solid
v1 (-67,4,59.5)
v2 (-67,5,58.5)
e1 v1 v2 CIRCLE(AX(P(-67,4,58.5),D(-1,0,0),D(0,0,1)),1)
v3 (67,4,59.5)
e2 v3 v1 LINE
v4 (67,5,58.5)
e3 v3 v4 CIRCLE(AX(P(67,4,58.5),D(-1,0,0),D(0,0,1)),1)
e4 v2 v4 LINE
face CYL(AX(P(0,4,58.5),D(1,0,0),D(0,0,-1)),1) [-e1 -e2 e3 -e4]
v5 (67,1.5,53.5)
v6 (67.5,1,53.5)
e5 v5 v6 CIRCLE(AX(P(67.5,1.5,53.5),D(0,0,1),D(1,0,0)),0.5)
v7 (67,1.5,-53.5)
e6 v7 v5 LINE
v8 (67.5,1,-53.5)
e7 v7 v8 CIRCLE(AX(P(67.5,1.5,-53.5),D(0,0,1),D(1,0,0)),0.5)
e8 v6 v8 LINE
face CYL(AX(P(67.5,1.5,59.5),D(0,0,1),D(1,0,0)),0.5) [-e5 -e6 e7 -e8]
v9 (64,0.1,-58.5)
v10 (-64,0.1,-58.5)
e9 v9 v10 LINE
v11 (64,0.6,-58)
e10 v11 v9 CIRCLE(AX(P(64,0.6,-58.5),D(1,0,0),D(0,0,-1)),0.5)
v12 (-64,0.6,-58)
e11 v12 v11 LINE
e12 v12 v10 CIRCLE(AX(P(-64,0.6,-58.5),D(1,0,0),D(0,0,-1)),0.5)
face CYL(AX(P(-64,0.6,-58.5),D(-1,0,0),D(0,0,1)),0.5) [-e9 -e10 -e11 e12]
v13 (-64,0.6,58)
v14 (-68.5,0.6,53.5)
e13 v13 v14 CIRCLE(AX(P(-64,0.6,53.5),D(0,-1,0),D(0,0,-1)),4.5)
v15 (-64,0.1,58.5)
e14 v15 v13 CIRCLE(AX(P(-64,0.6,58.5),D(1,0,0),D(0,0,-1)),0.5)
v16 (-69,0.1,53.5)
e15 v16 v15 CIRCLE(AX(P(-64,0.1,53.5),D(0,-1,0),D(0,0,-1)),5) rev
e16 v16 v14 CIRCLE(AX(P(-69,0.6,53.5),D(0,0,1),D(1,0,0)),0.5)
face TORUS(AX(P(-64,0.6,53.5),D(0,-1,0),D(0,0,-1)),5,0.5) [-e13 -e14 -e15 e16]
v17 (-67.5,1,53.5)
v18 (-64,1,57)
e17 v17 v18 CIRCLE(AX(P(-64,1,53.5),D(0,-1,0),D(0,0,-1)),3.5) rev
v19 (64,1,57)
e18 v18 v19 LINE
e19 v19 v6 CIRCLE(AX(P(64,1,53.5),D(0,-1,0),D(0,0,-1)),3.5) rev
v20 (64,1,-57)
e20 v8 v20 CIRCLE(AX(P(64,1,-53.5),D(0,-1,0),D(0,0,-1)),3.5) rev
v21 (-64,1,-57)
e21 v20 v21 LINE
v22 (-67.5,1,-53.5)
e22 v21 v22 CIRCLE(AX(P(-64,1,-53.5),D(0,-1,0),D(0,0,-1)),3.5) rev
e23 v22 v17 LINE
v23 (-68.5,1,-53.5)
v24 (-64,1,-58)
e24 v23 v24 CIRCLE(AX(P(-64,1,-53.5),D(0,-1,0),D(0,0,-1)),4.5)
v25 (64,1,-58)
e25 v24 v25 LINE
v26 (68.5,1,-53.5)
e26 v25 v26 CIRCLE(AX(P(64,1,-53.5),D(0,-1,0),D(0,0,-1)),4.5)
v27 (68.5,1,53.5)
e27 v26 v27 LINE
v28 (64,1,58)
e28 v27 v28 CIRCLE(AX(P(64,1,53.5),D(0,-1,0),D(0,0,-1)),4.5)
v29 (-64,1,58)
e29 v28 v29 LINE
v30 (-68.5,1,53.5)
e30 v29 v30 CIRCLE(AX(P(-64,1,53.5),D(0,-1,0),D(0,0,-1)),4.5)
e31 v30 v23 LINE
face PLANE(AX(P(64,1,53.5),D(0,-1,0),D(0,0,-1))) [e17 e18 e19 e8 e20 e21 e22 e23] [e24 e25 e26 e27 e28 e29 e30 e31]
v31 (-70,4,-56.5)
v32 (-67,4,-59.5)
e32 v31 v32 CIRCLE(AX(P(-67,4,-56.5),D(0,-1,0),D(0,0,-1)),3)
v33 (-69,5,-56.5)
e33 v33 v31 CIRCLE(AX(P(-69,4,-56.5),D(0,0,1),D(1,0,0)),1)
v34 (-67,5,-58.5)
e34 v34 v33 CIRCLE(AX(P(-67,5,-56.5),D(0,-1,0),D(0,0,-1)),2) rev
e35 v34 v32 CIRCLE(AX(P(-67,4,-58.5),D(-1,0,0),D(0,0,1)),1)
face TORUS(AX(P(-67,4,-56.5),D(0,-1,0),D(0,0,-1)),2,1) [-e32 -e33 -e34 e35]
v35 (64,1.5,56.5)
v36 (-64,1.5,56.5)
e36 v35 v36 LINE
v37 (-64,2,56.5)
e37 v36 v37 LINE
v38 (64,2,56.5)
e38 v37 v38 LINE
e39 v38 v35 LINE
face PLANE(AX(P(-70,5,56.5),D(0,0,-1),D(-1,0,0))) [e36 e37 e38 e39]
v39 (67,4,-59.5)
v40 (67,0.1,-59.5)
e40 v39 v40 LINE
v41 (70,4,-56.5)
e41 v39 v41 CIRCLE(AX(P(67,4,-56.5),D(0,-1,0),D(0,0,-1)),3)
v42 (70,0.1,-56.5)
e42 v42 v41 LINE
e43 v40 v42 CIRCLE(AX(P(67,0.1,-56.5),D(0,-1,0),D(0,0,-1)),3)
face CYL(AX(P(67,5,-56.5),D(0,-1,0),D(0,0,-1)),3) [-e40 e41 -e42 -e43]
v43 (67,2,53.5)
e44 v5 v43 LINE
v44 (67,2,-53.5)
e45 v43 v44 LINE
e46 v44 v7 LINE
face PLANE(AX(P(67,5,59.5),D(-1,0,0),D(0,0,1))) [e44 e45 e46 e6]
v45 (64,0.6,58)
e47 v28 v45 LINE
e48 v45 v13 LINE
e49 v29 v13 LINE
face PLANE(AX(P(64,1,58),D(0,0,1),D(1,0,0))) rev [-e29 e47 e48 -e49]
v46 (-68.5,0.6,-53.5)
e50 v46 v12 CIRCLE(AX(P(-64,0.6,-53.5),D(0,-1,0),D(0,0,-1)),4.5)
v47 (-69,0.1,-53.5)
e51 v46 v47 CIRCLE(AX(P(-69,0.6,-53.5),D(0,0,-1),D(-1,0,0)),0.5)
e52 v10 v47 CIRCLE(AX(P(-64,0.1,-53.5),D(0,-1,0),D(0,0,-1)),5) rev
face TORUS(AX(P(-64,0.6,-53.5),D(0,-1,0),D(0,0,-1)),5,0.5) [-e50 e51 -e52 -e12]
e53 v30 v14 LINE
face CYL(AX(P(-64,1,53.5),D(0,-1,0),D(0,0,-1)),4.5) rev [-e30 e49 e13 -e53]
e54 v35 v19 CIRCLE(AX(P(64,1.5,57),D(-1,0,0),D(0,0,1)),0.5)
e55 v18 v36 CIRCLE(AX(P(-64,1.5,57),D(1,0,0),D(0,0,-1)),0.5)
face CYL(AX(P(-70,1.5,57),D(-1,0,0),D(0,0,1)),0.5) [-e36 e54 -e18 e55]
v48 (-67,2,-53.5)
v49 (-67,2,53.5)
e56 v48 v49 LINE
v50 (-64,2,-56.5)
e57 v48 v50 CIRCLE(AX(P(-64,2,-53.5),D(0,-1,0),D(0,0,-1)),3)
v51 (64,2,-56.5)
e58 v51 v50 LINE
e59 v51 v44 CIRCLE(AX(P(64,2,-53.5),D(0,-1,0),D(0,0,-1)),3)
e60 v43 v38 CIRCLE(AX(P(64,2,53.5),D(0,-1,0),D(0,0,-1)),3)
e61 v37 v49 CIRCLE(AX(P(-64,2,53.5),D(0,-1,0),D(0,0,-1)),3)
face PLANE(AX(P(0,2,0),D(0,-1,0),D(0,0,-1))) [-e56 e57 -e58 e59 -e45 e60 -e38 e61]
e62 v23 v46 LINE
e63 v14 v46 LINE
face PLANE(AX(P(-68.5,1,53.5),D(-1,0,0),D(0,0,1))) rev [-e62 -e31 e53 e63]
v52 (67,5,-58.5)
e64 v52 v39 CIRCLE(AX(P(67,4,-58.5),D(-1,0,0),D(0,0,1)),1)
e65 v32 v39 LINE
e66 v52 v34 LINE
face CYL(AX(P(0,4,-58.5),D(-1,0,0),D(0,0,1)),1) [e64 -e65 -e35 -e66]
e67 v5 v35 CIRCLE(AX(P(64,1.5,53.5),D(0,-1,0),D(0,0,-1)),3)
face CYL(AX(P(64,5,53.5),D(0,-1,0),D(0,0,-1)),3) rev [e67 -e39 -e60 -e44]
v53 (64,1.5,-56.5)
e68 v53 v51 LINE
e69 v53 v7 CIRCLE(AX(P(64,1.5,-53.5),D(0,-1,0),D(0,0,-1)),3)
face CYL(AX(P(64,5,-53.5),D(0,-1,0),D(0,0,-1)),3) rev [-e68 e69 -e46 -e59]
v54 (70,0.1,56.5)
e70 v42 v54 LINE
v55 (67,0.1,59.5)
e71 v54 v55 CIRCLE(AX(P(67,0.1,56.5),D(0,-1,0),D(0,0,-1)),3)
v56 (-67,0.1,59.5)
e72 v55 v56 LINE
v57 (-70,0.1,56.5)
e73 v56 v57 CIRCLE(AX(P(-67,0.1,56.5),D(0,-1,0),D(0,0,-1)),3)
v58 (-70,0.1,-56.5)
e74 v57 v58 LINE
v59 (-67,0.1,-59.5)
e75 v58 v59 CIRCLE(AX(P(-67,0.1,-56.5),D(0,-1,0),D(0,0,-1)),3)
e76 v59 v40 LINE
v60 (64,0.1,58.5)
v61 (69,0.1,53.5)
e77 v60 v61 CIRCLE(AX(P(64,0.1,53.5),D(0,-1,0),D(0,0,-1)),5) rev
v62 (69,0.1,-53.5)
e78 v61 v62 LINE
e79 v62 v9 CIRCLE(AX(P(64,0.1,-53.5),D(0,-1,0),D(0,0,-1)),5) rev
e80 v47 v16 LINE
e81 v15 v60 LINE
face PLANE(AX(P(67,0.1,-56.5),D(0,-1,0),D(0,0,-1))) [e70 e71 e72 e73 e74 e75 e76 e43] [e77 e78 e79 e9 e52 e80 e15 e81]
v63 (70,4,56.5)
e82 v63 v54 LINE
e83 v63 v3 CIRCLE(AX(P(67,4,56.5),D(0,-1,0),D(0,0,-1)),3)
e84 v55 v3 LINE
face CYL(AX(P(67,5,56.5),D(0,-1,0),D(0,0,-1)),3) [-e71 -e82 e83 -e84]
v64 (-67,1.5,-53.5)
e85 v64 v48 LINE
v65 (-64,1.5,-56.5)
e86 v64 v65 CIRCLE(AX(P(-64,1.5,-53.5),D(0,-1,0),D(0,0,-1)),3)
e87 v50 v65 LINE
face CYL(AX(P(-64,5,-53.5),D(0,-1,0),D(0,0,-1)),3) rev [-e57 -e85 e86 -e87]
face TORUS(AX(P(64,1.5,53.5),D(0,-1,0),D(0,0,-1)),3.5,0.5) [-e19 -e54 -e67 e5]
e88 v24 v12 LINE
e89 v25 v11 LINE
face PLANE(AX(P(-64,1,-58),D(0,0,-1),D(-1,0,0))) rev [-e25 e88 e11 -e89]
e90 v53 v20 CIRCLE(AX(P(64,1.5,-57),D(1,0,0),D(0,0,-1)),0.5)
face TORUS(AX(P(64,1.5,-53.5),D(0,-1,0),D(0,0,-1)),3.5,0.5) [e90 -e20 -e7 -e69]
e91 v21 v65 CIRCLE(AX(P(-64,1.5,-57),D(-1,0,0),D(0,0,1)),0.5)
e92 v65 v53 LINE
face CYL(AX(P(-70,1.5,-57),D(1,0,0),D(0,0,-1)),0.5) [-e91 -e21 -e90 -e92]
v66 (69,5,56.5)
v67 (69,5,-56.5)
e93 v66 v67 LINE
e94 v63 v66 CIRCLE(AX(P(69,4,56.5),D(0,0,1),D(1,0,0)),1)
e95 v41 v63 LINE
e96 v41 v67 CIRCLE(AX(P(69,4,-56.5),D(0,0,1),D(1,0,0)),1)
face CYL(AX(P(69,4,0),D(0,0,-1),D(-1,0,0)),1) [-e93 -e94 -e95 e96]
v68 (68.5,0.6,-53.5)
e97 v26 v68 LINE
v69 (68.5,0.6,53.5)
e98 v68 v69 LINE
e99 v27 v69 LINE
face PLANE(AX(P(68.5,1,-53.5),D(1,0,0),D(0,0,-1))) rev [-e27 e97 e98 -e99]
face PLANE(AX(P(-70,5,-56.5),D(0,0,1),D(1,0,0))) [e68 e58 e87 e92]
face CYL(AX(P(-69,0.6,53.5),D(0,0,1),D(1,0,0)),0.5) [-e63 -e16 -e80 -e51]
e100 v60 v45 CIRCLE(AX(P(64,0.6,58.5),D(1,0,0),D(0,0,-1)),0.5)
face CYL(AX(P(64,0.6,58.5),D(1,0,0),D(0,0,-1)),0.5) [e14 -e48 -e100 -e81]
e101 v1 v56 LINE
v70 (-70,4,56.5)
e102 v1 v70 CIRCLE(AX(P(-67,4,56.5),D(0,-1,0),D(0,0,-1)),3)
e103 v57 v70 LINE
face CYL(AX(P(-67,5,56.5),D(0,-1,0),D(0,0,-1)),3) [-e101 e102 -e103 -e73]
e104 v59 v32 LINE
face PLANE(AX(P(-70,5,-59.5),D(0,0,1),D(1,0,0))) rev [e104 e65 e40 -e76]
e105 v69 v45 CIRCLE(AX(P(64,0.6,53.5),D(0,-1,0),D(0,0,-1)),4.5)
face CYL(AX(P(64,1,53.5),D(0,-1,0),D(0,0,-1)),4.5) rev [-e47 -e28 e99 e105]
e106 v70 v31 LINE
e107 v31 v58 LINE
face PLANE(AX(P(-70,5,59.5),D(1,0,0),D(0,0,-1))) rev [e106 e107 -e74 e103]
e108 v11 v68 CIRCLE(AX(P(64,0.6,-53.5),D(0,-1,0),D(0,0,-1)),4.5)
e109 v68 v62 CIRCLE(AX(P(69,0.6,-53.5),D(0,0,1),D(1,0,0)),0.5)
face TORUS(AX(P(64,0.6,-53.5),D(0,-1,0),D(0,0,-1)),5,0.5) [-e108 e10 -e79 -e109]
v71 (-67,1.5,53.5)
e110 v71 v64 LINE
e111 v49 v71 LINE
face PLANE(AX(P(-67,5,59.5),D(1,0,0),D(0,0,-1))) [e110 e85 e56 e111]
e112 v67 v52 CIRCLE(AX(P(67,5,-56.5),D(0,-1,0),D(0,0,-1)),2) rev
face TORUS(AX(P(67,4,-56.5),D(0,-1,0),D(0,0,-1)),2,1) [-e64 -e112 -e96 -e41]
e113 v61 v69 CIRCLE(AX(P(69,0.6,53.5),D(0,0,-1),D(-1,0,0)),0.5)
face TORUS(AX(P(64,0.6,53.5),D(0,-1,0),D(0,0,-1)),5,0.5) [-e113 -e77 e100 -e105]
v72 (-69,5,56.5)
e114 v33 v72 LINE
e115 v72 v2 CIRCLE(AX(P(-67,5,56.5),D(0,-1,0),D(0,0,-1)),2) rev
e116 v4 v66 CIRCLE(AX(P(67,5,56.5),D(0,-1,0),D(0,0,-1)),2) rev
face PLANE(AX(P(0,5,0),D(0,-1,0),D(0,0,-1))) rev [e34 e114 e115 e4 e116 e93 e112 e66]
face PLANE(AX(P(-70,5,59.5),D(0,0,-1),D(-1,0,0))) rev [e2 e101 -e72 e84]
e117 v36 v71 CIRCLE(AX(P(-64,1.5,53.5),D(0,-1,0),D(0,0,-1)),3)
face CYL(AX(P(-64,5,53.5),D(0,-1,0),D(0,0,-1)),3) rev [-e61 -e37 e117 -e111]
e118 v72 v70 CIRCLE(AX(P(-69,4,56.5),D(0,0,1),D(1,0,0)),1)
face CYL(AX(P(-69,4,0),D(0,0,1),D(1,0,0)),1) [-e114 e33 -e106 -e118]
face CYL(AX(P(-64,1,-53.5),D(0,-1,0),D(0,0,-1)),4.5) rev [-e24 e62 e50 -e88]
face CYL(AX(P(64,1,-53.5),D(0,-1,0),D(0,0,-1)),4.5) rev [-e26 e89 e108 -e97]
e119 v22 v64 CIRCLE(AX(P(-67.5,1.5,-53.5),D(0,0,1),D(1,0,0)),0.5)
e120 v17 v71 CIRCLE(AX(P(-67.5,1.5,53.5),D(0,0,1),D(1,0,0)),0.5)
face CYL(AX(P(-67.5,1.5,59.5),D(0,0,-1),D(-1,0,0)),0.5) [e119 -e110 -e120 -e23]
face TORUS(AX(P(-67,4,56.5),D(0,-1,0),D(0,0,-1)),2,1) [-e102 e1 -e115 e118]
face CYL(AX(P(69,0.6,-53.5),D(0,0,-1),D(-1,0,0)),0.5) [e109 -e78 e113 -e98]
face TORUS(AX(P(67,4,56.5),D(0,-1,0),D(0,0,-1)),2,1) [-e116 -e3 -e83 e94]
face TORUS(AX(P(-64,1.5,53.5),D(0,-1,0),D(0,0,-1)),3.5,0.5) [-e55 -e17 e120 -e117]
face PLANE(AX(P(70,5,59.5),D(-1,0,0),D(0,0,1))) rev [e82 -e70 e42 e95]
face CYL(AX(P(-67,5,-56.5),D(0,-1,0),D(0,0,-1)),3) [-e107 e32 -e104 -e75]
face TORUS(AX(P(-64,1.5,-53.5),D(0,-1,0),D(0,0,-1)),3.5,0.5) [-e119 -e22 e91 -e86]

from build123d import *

# Parameters (mm, degrees)
SKETCH1_W           = 140
SKETCH1_H           = 119
BOSS_EXTRUDE1_DEPTH = 5
FILLET1_R           = 3
SHELL1_START        = -67
SHELL1_OUTLINE_W    = 2
SHELL1_OUTLINE_H    = 113
SHELL1_DEPTH        = 134
FILLET2_R           = 3
CUT_EXTRUDE1_DEPTH  = 1
CUT_EXTRUDE2_DEPTH  = 0.1
FILLET3_R           = 1
FILLET5_R           = 0.5


# Read off the part's stored shape, not the designer's step: Shell1
with BuildPart() as part:
    # Sketch1 → Boss-Extrude1 (new body)
    with BuildSketch(Plane(origin=(0, 0, 0), x_dir=(1, 0, 0), z_dir=(0, 1, 0))):
        Rectangle(SKETCH1_W, SKETCH1_H)
    extrude(amount=BOSS_EXTRUDE1_DEPTH)

    # Fillet1
    fillet1_edges = [part.edges().sort_by_distance(p)[0] for p in [
        (70, 2.5, 59.5),
        (-70, 2.5, 59.5),
        (-70, 2.5, -59.5),
        (70, 2.5, -59.5),
    ]]
    fillet(fillet1_edges, radius=FILLET1_R)

    # Shell1 outline → Shell1 (cut)
    with BuildSketch(Plane.YZ.offset(SHELL1_START)):
        with Locations((1, 0)):
            Rectangle(SHELL1_OUTLINE_W, SHELL1_OUTLINE_H)
    extrude(amount=SHELL1_DEPTH, mode=Mode.SUBTRACT)

    # Fillet2
    fillet2_edges = [part.edges().sort_by_distance(p)[0] for p in [
        (67, 1, -56.5),
        (-67, 1, -56.5),
        (-67, 1, 56.5),
        (67, 1, 56.5),
    ]]
    fillet(fillet2_edges, radius=FILLET2_R)

    # Sketch2 → Cut-Extrude1 (cut)
    with BuildSketch(Plane.XZ):
        with BuildLine():
            Line((68.5, -53.5), (68.5, 53.5))
            ThreePointArc((68.5, 53.5), (67.181980515, 56.681980515), (64, 58))
            Line((64, 58), (-64, 58))
            ThreePointArc((-64, 58), (-67.181980515, 56.681980515), (-68.5, 53.5))
            Line((-68.5, 53.5), (-68.5, -53.5))
            ThreePointArc((-68.5, -53.5), (-67.181980515, -56.681980515), (-64, -58))
            Line((-64, -58), (64, -58))
            ThreePointArc((64, -58), (67.181980515, -56.681980515), (68.5, -53.5))
        make_face()
        with BuildLine():
            Line((67, 53.5), (67, -53.5))
            ThreePointArc((67, -53.5), (66.121320344, -55.621320344), (64, -56.5))
            Line((64, -56.5), (-64, -56.5))
            ThreePointArc((-64, -56.5), (-66.121320344, -55.621320344), (-67, -53.5))
            Line((-67, -53.5), (-67, 53.5))
            ThreePointArc((-67, 53.5), (-66.121320344, 55.621320344), (-64, 56.5))
            Line((-64, 56.5), (64, 56.5))
            ThreePointArc((64, 56.5), (66.121320344, 55.621320344), (67, 53.5))
        make_face(mode=Mode.SUBTRACT)
    extrude(amount=-CUT_EXTRUDE1_DEPTH, mode=Mode.SUBTRACT)

    # Sketch3 → Cut-Extrude2 (cut)
    with BuildSketch(Plane.XZ):
        with BuildLine():
            Line((70, -56.5), (70, 56.5))
            ThreePointArc((70, 56.5), (69.121320344, 58.621320344), (67, 59.5))
            Line((67, 59.5), (-67, 59.5))
            ThreePointArc((-67, 59.5), (-69.121320344, 58.621320344), (-70, 56.5))
            Line((-70, 56.5), (-70, -56.5))
            ThreePointArc((-70, -56.5), (-69.121320344, -58.621320344), (-67, -59.5))
            Line((-67, -59.5), (67, -59.5))
            ThreePointArc((67, -59.5), (69.121320344, -58.621320344), (70, -56.5))
        make_face()
        with BuildLine():
            Line((-64, -58), (64, -58))
            ThreePointArc((64, -58), (67.181980515, -56.681980515), (68.5, -53.5))
            Line((68.5, -53.5), (68.5, 53.5))
            ThreePointArc((68.5, 53.5), (67.181980515, 56.681980515), (64, 58))
            Line((64, 58), (-64, 58))
            ThreePointArc((-64, 58), (-67.181980515, 56.681980515), (-68.5, 53.5))
            Line((-68.5, 53.5), (-68.5, -53.5))
            ThreePointArc((-68.5, -53.5), (-67.181980515, -56.681980515), (-64, -58))
        make_face(mode=Mode.SUBTRACT)
    extrude(amount=-CUT_EXTRUDE2_DEPTH, mode=Mode.SUBTRACT)

    # Fillet3
    fillet3_edges = [part.edges().sort_by_distance(p)[0] for p in [
        (70, 5, 0),
        (0, 5, 59.5),
        (0, 5, -59.5),
        (-70, 5, 0),
        (-69.121320344, 5, 58.621320344),
        (69.121320344, 5, -58.621320344),
        (-69.121320344, 5, -58.621320344),
        (69.121320344, 5, 58.621320344),
    ]]
    fillet(fillet3_edges, radius=FILLET3_R)

    # Fillet5
    fillet5_edges = [part.edges().sort_by_distance(p)[0] for p in [
        (-68.5, 0.1, 0),
        (-67.181980515, 0.1, -56.681980515),
        (0, 0.1, -58),
        (67.181980515, 0.1, -56.681980515),
        (68.5, 0.1, 0),
        (67.181980515, 0.1, 56.681980515),
        (0, 0.1, 58),
        (-67.181980515, 0.1, 56.681980515),
        (-67, 1, 0),
        (-66.121320344, 1, -55.621320344),
        (0, 1, -56.5),
        (66.121320344, 1, -55.621320344),
        (67, 1, 0),
        (66.121320344, 1, 55.621320344),
        (0, 1, 56.5),
        (-66.121320344, 1, 55.621320344),
    ]]
    fillet(fillet5_edges, radius=FILLET5_R)


solid = part.part
